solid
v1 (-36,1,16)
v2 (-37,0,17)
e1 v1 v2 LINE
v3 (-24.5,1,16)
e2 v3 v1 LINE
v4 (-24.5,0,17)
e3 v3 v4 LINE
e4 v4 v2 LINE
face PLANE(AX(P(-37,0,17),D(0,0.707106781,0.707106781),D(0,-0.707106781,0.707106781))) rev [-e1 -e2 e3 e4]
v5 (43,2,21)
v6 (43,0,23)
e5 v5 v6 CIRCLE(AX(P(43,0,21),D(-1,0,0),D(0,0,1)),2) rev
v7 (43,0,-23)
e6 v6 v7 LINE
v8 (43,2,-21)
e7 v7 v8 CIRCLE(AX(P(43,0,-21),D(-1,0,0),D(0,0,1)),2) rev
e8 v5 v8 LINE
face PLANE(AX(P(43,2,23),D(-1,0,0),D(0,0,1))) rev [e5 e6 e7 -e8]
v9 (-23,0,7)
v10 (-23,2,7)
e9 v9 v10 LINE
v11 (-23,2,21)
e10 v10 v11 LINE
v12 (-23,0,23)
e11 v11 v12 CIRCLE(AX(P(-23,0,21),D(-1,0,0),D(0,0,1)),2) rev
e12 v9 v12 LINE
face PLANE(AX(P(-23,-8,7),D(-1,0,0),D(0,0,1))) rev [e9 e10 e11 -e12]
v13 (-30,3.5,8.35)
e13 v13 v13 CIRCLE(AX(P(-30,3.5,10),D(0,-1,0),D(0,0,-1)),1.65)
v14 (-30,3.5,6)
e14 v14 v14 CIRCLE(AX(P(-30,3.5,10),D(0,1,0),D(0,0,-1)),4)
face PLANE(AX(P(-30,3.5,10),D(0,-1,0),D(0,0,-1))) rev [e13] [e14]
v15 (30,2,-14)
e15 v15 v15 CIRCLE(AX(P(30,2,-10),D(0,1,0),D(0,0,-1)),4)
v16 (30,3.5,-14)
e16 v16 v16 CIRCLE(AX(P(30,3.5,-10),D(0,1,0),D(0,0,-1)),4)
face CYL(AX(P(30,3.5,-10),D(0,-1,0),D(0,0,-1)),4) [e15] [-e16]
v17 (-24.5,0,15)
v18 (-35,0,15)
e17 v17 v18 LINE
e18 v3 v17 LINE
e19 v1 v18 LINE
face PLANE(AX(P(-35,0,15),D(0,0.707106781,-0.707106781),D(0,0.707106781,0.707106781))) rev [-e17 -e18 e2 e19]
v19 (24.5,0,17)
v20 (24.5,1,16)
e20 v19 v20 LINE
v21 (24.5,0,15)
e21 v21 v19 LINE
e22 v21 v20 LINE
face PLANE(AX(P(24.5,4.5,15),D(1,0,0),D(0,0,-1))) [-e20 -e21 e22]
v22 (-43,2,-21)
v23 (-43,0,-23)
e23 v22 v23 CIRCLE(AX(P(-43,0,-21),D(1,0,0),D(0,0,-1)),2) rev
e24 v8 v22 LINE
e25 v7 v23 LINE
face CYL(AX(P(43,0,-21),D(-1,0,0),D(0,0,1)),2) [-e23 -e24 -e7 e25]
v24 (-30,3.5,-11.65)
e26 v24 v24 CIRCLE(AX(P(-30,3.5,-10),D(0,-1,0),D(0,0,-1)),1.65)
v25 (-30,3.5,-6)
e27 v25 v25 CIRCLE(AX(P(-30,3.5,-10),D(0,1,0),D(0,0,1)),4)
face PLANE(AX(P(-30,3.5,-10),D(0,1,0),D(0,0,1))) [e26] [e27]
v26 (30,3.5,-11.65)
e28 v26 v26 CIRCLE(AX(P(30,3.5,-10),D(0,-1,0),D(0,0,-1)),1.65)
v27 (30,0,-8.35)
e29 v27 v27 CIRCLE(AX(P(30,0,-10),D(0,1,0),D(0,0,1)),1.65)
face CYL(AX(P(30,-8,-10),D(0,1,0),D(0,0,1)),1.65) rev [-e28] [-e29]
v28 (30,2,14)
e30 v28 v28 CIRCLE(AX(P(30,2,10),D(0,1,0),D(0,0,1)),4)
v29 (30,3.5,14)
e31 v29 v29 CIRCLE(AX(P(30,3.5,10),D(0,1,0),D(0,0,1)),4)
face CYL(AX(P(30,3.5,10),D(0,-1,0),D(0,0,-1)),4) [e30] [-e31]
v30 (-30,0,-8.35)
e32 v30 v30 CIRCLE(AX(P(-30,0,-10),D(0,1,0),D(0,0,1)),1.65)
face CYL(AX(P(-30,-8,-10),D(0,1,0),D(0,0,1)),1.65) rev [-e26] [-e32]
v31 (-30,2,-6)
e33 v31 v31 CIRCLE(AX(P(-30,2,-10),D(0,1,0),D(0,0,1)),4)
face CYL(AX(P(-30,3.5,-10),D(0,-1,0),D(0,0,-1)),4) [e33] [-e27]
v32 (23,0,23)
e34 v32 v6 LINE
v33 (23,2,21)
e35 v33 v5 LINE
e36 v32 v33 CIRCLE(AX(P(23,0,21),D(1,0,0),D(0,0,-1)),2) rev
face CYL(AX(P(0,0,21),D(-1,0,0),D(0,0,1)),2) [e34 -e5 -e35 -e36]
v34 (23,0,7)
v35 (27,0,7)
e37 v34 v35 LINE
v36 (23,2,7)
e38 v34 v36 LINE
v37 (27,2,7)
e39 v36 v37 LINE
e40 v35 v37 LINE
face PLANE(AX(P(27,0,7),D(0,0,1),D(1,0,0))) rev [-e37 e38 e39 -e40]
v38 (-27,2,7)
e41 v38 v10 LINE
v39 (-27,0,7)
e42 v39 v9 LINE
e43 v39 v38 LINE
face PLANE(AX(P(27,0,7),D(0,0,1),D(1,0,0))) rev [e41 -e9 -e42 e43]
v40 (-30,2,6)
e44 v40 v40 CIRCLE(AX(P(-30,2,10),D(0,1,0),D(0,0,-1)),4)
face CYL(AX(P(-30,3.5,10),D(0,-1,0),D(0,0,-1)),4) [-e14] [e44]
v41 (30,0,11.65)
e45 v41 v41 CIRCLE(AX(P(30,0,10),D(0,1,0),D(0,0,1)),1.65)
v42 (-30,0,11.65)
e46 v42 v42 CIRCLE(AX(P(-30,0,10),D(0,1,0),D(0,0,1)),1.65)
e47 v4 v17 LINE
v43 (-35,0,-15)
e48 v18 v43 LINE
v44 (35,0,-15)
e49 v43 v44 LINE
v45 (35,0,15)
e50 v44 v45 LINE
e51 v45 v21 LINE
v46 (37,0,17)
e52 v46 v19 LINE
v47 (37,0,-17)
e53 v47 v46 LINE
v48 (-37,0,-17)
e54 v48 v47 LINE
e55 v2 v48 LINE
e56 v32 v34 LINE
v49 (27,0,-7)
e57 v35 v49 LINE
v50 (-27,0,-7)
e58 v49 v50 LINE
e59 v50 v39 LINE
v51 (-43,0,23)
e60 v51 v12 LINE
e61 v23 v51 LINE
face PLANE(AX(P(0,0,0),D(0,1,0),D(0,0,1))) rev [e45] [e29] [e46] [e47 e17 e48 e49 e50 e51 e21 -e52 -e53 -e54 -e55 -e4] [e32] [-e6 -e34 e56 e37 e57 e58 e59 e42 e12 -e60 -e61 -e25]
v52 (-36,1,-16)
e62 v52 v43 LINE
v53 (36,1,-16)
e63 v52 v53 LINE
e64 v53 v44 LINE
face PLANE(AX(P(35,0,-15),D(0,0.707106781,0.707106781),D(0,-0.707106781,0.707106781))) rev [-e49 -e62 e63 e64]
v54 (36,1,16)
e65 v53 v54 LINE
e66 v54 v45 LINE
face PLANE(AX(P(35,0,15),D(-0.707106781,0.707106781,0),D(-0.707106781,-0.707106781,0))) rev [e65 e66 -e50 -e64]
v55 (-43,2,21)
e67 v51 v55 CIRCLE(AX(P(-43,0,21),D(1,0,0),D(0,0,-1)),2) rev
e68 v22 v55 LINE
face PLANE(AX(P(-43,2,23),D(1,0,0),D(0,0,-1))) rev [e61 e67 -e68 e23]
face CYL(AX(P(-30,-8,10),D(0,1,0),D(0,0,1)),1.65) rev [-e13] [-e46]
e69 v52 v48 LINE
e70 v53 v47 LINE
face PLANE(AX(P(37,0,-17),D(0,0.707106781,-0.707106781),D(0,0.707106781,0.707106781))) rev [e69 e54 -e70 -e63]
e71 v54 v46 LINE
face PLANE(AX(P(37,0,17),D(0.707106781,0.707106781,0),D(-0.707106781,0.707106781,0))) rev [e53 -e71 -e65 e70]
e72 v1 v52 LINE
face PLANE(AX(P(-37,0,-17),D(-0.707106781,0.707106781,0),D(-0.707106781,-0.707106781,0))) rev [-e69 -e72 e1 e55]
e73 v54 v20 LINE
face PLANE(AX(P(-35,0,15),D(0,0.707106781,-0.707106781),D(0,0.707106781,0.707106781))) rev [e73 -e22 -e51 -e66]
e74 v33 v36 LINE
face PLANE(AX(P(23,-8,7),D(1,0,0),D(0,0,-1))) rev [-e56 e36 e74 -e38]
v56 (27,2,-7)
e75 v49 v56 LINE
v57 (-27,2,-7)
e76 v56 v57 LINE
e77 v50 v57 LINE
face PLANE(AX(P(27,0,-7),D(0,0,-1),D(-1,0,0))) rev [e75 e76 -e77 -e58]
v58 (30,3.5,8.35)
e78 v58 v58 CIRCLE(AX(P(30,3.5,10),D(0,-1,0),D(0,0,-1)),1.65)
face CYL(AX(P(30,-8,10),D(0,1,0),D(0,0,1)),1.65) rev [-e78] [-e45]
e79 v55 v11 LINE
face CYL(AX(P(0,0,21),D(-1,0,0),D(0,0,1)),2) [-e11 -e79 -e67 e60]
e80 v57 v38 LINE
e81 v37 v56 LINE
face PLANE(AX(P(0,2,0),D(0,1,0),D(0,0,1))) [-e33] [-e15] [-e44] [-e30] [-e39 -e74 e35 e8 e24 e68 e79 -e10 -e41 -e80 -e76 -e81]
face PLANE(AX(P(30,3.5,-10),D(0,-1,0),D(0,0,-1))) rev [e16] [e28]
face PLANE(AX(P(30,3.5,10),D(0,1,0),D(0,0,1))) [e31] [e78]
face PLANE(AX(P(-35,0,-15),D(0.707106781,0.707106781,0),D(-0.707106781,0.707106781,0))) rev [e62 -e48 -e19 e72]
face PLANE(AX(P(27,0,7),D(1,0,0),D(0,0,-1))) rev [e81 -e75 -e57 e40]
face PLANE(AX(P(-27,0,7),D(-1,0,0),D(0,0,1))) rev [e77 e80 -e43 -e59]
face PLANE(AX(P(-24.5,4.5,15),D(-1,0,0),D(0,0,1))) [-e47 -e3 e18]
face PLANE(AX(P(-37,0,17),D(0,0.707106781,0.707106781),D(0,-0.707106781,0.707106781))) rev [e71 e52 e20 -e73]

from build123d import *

# Parameters (mm, degrees)
SKETCH1_W               = 86
SKETCH1_H               = 46
BOSS_EXTRUDE1_DEPTH     = 2
SKETCH2_W               = 54
SKETCH2_H               = 14
CUT_EXTRUDE1_DEPTH      = 49.805737368
SKETCH4_R               = 4
BOSS_EXTRUDE2_DEPTH     = 1.5
CUT_EXTRUDE2_DEPTH      = 1.5
CUT_EXTRUDE2_DEPTH_BACK = 10
SKETCH3_R               = 1.65
SKETCH5_W               = 74
SKETCH5_H               = 34
SKETCH5_W_2             = 70
SKETCH5_H_2             = 30
CUT_EXTRUDE3_DEPTH      = 10
CUT_EXTRUDE3_TAPER      = 45
FILLET1_R               = 2
FILLET2_R               = 2
SKETCH6_W               = 46
SKETCH6_H               = 16
CUT_EXTRUDE4_DEPTH      = 10
BOSS_EXTRUDE3_START     = -1
SKETCH8_W               = 1.5
SKETCH8_H               = 2
BOSS_EXTRUDE3_DEPTH     = 1


with BuildPart() as part:
    # Sketch1 → Boss-Extrude1 (new body)
    with BuildSketch(Plane(origin=(0, 0, 0), x_dir=(1, 0, 0), z_dir=(0, 1, 0))):
        Rectangle(SKETCH1_W, SKETCH1_H)
    extrude(amount=BOSS_EXTRUDE1_DEPTH)

    # Sketch2 → Cut-Extrude1 (cut, through all)
    with BuildSketch(Plane(origin=(0, 2, 0), x_dir=(1, 0, 0), z_dir=(0, 1, 0))):
        Rectangle(SKETCH2_W, SKETCH2_H)
    extrude(amount=-CUT_EXTRUDE1_DEPTH, mode=Mode.SUBTRACT)

    # Sketch4 → Boss-Extrude2 (add)
    with BuildSketch(Plane(origin=(0, 2, 0), x_dir=(1, 0, 0), z_dir=(0, 1, 0))):
        with Locations(Location((-30, 10, 0), (0, 0, 270))):
            Circle(SKETCH4_R)
        with Locations(Location((-30, -10, 0), (0, 0, 90))):
            Circle(SKETCH4_R)
        with Locations(Location((30, -10, 0), (0, 0, 270))):
            Circle(SKETCH4_R)
        with Locations(Location((30, 10, 0), (0, 0, 90))):
            Circle(SKETCH4_R)
    extrude(amount=BOSS_EXTRUDE2_DEPTH)

    # Sketch3 → Cut-Extrude2 (cut, two sides: drawn at the far end of the back side and taken through both)
    with BuildSketch(Plane(origin=(0, 2, 0), x_dir=(1, 0, 0), z_dir=(0, 1, 0)).offset(-CUT_EXTRUDE2_DEPTH_BACK)):
        with Locations(Location((-30, 10, 0), (0, 0, 270))):
            Circle(SKETCH3_R)
        with Locations(Location((30, 10, 0), (0, 0, 270))):
            Circle(SKETCH3_R)
        with Locations(Location((30, -10, 0), (0, 0, 270))):
            Circle(SKETCH3_R)
        with Locations(Location((-30, -10, 0), (0, 0, 270))):
            Circle(SKETCH3_R)
    extrude(amount=CUT_EXTRUDE2_DEPTH + CUT_EXTRUDE2_DEPTH_BACK, mode=Mode.SUBTRACT)

    # Sketch5 → Cut-Extrude3 (cut)
    with BuildSketch(Plane.XZ):
        Rectangle(SKETCH5_W, SKETCH5_H)
        Rectangle(SKETCH5_W_2, SKETCH5_H_2, mode=Mode.SUBTRACT)
    extrude(amount=-CUT_EXTRUDE3_DEPTH, taper=CUT_EXTRUDE3_TAPER, mode=Mode.SUBTRACT)

    # Fillet1
    fillet1_edges = [part.edges().sort_by_distance(p)[0] for p in [
        (0, 2, -23),
    ]]
    fillet(fillet1_edges, radius=FILLET1_R - 0.0001)  # a hair under: the kernel refuses the full size

    # Fillet2
    fillet2_edges = [part.edges().sort_by_distance(p)[0] for p in [
        (0, 2, 23),
    ]]
    fillet(fillet2_edges, radius=FILLET2_R - 0.0001)  # a hair under: the kernel refuses the full size

    # Sketch6 → Cut-Extrude4 (cut)
    with BuildSketch(Plane(origin=(0, 2, 0), x_dir=(1, 0, 0), z_dir=(0, 1, 0))):
        with Locations((0, -15)):
            Rectangle(SKETCH6_W, SKETCH6_H)
    extrude(amount=-CUT_EXTRUDE4_DEPTH, mode=Mode.SUBTRACT)

    # Sketch8 → Boss-Extrude3 (add)
    with BuildSketch(Plane.XZ.offset(BOSS_EXTRUDE3_START)):
        with Locations((23.75, 16)):
            Rectangle(SKETCH8_W, SKETCH8_H)
        with Locations((-23.75, 16)):
            Rectangle(SKETCH8_W, SKETCH8_H)
    extrude(amount=BOSS_EXTRUDE3_DEPTH)


solid = part.part
